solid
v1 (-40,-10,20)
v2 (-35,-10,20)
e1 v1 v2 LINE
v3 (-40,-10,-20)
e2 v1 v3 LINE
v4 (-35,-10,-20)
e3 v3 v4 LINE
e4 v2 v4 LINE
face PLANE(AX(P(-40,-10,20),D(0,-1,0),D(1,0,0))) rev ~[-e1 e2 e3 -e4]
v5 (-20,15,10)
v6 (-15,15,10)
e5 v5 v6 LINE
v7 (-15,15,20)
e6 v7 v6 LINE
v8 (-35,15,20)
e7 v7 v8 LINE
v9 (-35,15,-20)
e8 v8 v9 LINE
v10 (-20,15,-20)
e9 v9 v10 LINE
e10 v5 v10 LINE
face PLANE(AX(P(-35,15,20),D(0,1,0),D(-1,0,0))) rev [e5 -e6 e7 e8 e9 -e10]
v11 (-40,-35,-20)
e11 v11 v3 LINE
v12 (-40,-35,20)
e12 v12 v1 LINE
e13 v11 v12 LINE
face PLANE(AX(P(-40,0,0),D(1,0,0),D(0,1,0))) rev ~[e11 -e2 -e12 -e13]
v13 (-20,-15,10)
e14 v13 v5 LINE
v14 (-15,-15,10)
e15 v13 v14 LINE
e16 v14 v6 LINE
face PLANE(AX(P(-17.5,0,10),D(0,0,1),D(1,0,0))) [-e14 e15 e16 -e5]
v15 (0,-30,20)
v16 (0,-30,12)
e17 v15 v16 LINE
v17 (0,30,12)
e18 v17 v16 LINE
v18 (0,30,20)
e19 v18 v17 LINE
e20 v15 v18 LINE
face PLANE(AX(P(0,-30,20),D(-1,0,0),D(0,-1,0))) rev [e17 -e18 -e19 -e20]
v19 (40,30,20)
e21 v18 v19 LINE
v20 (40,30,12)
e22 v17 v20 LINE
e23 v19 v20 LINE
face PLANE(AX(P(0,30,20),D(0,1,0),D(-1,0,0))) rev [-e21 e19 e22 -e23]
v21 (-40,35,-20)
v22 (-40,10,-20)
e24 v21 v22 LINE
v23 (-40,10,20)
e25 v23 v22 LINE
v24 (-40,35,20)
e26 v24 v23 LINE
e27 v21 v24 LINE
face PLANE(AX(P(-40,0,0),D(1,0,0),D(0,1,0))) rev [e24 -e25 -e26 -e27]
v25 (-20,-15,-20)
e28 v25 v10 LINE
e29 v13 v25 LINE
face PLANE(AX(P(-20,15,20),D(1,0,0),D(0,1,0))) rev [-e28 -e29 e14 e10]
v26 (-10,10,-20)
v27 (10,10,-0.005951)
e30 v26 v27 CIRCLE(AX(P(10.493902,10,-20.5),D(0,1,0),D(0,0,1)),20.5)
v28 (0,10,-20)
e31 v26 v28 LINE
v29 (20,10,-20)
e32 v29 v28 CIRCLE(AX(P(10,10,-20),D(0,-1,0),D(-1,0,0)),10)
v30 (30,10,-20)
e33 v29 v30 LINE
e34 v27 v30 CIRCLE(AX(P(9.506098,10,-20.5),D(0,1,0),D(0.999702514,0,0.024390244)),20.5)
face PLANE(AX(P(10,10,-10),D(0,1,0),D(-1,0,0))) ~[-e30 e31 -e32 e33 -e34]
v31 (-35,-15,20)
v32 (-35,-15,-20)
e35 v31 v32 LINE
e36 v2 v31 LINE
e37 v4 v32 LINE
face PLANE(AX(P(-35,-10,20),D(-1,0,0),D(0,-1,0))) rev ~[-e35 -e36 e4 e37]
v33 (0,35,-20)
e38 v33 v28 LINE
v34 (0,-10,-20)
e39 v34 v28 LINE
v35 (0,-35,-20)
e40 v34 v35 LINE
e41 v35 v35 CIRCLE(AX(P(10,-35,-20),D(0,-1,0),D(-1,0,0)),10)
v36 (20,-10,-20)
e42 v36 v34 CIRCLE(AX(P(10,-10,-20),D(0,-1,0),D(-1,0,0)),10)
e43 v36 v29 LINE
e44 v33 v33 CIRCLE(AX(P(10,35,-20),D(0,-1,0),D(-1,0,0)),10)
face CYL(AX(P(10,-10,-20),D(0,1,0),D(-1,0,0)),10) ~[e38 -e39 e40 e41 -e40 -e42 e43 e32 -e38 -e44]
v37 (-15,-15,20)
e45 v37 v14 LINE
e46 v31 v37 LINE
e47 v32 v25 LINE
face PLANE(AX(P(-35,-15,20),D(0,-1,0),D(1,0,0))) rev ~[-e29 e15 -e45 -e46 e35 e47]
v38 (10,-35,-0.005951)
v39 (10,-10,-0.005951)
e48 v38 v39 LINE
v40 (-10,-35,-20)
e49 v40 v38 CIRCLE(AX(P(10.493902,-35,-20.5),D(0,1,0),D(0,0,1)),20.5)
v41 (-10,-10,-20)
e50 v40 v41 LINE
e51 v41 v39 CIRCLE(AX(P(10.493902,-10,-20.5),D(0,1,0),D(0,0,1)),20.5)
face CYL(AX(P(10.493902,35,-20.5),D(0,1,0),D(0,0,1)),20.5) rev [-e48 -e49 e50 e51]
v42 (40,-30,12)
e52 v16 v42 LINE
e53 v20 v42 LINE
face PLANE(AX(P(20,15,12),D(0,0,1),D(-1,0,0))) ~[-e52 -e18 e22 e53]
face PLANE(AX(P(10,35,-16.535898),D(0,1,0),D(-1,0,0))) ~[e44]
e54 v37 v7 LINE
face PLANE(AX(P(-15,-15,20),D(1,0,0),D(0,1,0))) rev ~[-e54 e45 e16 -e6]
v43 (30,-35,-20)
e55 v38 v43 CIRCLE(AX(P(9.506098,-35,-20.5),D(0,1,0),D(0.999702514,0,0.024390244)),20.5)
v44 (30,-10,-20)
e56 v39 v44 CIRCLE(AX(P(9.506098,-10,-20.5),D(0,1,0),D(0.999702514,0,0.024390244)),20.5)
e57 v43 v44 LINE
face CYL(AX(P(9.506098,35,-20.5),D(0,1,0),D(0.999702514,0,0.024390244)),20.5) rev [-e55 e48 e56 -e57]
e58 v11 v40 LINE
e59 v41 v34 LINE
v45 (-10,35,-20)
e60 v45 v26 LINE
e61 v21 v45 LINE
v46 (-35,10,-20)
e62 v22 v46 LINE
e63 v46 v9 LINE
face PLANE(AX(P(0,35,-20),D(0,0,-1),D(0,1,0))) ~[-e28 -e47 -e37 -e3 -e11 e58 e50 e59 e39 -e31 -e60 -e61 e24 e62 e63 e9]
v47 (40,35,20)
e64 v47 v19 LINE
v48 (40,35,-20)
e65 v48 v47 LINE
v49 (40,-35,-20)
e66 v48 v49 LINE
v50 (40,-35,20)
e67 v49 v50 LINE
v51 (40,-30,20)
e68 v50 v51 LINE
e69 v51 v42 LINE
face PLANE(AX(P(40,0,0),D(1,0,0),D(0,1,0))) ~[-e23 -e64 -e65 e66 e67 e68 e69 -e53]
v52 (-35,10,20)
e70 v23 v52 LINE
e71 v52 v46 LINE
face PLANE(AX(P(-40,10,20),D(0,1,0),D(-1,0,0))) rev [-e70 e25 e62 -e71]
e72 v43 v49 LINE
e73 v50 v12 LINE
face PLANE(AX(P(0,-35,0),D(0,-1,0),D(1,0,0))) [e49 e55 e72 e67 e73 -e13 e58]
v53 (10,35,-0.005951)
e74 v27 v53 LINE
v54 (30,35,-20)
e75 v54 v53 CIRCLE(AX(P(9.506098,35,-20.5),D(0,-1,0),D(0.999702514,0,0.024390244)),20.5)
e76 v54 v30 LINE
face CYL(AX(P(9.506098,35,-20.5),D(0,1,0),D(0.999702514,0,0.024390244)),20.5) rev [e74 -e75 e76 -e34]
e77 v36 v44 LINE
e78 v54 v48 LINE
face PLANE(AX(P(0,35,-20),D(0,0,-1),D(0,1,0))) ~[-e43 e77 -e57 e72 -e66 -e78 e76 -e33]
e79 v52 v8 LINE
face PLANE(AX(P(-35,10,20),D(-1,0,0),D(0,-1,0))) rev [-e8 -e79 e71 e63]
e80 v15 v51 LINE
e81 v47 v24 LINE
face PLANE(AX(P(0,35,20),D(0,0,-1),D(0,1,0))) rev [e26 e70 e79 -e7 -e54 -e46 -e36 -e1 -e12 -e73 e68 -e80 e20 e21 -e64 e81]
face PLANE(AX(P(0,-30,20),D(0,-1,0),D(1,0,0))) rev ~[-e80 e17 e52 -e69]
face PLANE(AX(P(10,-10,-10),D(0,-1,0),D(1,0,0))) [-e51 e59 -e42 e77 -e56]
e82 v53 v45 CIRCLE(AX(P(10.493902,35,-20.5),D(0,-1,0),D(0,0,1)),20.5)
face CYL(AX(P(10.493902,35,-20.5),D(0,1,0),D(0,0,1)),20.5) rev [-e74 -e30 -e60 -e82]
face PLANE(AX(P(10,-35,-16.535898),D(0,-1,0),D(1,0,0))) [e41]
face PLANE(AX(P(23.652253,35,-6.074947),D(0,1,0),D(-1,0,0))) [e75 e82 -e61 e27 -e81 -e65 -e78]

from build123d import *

# Parameters (mm, degrees)
F0_W          = 70
F0_H          = 40
F1_DEPTH      = 40
F1_DEPTH_BACK = 40
F2_W          = 40
F2_H          = 30
F3_DEPTH      = 8
F5_DEPTH      = 40
F6_W          = 40
F6_H          = 20
F7_DEPTH      = 25
F9_DEPTH      = 25
F10_W         = 80
F10_H         = 40
F11_DEPTH     = 35
F13_DEPTH     = 25
F14_T4_DEPTH  = 76.2347538298
F14_T9_DEPTH  = 76.2347538298
F14_T14_DEPTH = 76.2347538298
F14_T19_DEPTH = 76.2347538298
F15_W         = 5
F15_H         = 30
F16_DEPTH     = 10


# Not quite as in the source:
# - a fillet or chamfer that OpenCascade refuses, or shapes differently, is made with other operations: its cross-section is extruded or revolved along the edge and cut away or added


with BuildPart() as f1:
    # F0 (on Right) → F1 (new body, two sides)
    with BuildSketch(Plane.YZ) as f1_sk:
        Rectangle(F0_W, F0_H)
    extrude(amount=F1_DEPTH)
    extrude(f1_sk.sketch, amount=-F1_DEPTH_BACK)

    # F2 (on face) → F3 (cut)
    with BuildSketch(Plane.XY.offset(20)):
        with Locations((20, -15)):
            Rectangle(F2_W, F2_H)
        with Locations((20, 15)):
            Rectangle(F2_W, F2_H)
    extrude(amount=-F3_DEPTH, mode=Mode.SUBTRACT)

    # F4 (on face) → F5 (cut)
    with BuildSketch(Plane.XY.offset(20)):
        Polygon((-40, 10), (-40, 0), (-20, 0), (-20, 15), (-35, 15), (-35, 10), align=None)
        Polygon((-20, 0), (-40, 0), (-40, -10), (-35, -10), (-35, -15), (-20, -15), align=None)
    extrude(amount=-F5_DEPTH, mode=Mode.SUBTRACT)

    # F6 (on face) → F7 (cut)
    with BuildSketch(Plane.XZ.offset(35)):
        with Locations((10, -10)):
            Rectangle(F6_W, F6_H)
    extrude(amount=-F7_DEPTH, mode=Mode.SUBTRACT)

    # F8 (on face) → F9 (join)
    with BuildSketch(Plane.XZ.offset(10)):
        with BuildLine():
            Line((0, -20), (20, -20))
            ThreePointArc((20, -20), (10, -10), (0, -20))
        make_face()
        with BuildLine():
            ThreePointArc((0, -20), (10, -30), (20, -20))
            Line((20, -20), (0, -20))
        make_face()
    extrude(amount=F9_DEPTH)

    # F10 (on face) → F11 (cut)
    with BuildSketch(Plane(origin=(0, 35, 0), x_dir=(-1, 0, 0), z_dir=(0, 1, 0))):
        Rectangle(F10_W, F10_H)
    extrude(amount=-F11_DEPTH, mode=Mode.SUBTRACT)

    # F12: F1 across plane


with BuildPart() as f1_1:
    add(f1.part)
    add(f1.part.mirror(Plane.XZ))

    # F13 (add): a face of the model
    f13_faces = [f1_1.faces().sort_by_distance(p)[0] for p in [
        (10, -10, -24.2441318158),
    ]]
    extrude(f13_faces, amount=F13_DEPTH)

    # F14: fillet of radius 20.5 on 4 edges, made by hand


with BuildPart() as f14_tool2:
    # F14_s3 → F14_t4 (new body)
    with BuildSketch(Plane.XZ.offset(-35)):
        with BuildLine():
            ThreePointArc((30, -20), (23.8239195314, -5.8285992489), (9.5060984681, 0))
            Line((9.5060984681, 0), (30, 0))
            Line((30, 0), (30, -20))
        make_face()
    extrude(amount=F14_T4_DEPTH)

    split(bisect_by=Plane.XZ.offset(35), keep=Keep.BOTTOM)


with BuildPart() as f1_2:
    add(f1_1.part)

    # F14_t1: union F14_tool2
    add(f14_tool2.part)


with BuildPart() as f14_tool7:
    # F14_s8 → F14_t9 (new body)
    with BuildSketch(Plane.XZ.offset(-35)):
        with BuildLine():
            ThreePointArc((10.4939015319, 0), (-3.8239195314, -5.8285992489), (-10, -20))
            Line((-10, -20), (-10, 0))
            Line((-10, 0), (10.4939015319, 0))
        make_face()
    extrude(amount=F14_T9_DEPTH)

    split(bisect_by=Plane.XZ.offset(35), keep=Keep.BOTTOM)


with BuildPart() as f1_3:
    add(f1_2.part)

    # F14_t6: union F14_tool7
    add(f14_tool7.part)


with BuildPart() as f14_tool12:
    # F14_s13 → F14_t14 (new body)
    with BuildSketch(Plane.XZ.offset(35)):
        with BuildLine():
            ThreePointArc((30, -20), (23.8239195314, -5.8285992489), (9.5060984681, 0))
            Line((9.5060984681, 0), (30, 0))
            Line((30, 0), (30, -20))
        make_face()
    extrude(amount=-F14_T14_DEPTH)

    split(bisect_by=Plane.XZ.offset(-35), keep=Keep.TOP)


with BuildPart() as f1_4:
    add(f1_3.part)

    # F14_t11: union F14_tool12
    add(f14_tool12.part)


with BuildPart() as f14_tool17:
    # F14_s18 → F14_t19 (new body)
    with BuildSketch(Plane.XZ.offset(35)):
        with BuildLine():
            ThreePointArc((-10, -20), (-3.8239195314, -5.8285992489), (10.4939015319, 0))
            Line((10.4939015319, 0), (-10, 0))
            Line((-10, 0), (-10, -20))
        make_face()
    extrude(amount=-F14_T19_DEPTH)

    split(bisect_by=Plane.XZ.offset(-35), keep=Keep.TOP)


with BuildPart() as f1_5:
    add(f1_4.part)

    # F14_t16: union F14_tool17
    add(f14_tool17.part)

    # F15 (on face) → F16 (cut)
    with BuildSketch(Plane.XY.offset(20)):
        with Locations((-17.5, 0)):
            Rectangle(F15_W, F15_H)
    extrude(amount=-F16_DEPTH, mode=Mode.SUBTRACT)


solid = f1_5.part
